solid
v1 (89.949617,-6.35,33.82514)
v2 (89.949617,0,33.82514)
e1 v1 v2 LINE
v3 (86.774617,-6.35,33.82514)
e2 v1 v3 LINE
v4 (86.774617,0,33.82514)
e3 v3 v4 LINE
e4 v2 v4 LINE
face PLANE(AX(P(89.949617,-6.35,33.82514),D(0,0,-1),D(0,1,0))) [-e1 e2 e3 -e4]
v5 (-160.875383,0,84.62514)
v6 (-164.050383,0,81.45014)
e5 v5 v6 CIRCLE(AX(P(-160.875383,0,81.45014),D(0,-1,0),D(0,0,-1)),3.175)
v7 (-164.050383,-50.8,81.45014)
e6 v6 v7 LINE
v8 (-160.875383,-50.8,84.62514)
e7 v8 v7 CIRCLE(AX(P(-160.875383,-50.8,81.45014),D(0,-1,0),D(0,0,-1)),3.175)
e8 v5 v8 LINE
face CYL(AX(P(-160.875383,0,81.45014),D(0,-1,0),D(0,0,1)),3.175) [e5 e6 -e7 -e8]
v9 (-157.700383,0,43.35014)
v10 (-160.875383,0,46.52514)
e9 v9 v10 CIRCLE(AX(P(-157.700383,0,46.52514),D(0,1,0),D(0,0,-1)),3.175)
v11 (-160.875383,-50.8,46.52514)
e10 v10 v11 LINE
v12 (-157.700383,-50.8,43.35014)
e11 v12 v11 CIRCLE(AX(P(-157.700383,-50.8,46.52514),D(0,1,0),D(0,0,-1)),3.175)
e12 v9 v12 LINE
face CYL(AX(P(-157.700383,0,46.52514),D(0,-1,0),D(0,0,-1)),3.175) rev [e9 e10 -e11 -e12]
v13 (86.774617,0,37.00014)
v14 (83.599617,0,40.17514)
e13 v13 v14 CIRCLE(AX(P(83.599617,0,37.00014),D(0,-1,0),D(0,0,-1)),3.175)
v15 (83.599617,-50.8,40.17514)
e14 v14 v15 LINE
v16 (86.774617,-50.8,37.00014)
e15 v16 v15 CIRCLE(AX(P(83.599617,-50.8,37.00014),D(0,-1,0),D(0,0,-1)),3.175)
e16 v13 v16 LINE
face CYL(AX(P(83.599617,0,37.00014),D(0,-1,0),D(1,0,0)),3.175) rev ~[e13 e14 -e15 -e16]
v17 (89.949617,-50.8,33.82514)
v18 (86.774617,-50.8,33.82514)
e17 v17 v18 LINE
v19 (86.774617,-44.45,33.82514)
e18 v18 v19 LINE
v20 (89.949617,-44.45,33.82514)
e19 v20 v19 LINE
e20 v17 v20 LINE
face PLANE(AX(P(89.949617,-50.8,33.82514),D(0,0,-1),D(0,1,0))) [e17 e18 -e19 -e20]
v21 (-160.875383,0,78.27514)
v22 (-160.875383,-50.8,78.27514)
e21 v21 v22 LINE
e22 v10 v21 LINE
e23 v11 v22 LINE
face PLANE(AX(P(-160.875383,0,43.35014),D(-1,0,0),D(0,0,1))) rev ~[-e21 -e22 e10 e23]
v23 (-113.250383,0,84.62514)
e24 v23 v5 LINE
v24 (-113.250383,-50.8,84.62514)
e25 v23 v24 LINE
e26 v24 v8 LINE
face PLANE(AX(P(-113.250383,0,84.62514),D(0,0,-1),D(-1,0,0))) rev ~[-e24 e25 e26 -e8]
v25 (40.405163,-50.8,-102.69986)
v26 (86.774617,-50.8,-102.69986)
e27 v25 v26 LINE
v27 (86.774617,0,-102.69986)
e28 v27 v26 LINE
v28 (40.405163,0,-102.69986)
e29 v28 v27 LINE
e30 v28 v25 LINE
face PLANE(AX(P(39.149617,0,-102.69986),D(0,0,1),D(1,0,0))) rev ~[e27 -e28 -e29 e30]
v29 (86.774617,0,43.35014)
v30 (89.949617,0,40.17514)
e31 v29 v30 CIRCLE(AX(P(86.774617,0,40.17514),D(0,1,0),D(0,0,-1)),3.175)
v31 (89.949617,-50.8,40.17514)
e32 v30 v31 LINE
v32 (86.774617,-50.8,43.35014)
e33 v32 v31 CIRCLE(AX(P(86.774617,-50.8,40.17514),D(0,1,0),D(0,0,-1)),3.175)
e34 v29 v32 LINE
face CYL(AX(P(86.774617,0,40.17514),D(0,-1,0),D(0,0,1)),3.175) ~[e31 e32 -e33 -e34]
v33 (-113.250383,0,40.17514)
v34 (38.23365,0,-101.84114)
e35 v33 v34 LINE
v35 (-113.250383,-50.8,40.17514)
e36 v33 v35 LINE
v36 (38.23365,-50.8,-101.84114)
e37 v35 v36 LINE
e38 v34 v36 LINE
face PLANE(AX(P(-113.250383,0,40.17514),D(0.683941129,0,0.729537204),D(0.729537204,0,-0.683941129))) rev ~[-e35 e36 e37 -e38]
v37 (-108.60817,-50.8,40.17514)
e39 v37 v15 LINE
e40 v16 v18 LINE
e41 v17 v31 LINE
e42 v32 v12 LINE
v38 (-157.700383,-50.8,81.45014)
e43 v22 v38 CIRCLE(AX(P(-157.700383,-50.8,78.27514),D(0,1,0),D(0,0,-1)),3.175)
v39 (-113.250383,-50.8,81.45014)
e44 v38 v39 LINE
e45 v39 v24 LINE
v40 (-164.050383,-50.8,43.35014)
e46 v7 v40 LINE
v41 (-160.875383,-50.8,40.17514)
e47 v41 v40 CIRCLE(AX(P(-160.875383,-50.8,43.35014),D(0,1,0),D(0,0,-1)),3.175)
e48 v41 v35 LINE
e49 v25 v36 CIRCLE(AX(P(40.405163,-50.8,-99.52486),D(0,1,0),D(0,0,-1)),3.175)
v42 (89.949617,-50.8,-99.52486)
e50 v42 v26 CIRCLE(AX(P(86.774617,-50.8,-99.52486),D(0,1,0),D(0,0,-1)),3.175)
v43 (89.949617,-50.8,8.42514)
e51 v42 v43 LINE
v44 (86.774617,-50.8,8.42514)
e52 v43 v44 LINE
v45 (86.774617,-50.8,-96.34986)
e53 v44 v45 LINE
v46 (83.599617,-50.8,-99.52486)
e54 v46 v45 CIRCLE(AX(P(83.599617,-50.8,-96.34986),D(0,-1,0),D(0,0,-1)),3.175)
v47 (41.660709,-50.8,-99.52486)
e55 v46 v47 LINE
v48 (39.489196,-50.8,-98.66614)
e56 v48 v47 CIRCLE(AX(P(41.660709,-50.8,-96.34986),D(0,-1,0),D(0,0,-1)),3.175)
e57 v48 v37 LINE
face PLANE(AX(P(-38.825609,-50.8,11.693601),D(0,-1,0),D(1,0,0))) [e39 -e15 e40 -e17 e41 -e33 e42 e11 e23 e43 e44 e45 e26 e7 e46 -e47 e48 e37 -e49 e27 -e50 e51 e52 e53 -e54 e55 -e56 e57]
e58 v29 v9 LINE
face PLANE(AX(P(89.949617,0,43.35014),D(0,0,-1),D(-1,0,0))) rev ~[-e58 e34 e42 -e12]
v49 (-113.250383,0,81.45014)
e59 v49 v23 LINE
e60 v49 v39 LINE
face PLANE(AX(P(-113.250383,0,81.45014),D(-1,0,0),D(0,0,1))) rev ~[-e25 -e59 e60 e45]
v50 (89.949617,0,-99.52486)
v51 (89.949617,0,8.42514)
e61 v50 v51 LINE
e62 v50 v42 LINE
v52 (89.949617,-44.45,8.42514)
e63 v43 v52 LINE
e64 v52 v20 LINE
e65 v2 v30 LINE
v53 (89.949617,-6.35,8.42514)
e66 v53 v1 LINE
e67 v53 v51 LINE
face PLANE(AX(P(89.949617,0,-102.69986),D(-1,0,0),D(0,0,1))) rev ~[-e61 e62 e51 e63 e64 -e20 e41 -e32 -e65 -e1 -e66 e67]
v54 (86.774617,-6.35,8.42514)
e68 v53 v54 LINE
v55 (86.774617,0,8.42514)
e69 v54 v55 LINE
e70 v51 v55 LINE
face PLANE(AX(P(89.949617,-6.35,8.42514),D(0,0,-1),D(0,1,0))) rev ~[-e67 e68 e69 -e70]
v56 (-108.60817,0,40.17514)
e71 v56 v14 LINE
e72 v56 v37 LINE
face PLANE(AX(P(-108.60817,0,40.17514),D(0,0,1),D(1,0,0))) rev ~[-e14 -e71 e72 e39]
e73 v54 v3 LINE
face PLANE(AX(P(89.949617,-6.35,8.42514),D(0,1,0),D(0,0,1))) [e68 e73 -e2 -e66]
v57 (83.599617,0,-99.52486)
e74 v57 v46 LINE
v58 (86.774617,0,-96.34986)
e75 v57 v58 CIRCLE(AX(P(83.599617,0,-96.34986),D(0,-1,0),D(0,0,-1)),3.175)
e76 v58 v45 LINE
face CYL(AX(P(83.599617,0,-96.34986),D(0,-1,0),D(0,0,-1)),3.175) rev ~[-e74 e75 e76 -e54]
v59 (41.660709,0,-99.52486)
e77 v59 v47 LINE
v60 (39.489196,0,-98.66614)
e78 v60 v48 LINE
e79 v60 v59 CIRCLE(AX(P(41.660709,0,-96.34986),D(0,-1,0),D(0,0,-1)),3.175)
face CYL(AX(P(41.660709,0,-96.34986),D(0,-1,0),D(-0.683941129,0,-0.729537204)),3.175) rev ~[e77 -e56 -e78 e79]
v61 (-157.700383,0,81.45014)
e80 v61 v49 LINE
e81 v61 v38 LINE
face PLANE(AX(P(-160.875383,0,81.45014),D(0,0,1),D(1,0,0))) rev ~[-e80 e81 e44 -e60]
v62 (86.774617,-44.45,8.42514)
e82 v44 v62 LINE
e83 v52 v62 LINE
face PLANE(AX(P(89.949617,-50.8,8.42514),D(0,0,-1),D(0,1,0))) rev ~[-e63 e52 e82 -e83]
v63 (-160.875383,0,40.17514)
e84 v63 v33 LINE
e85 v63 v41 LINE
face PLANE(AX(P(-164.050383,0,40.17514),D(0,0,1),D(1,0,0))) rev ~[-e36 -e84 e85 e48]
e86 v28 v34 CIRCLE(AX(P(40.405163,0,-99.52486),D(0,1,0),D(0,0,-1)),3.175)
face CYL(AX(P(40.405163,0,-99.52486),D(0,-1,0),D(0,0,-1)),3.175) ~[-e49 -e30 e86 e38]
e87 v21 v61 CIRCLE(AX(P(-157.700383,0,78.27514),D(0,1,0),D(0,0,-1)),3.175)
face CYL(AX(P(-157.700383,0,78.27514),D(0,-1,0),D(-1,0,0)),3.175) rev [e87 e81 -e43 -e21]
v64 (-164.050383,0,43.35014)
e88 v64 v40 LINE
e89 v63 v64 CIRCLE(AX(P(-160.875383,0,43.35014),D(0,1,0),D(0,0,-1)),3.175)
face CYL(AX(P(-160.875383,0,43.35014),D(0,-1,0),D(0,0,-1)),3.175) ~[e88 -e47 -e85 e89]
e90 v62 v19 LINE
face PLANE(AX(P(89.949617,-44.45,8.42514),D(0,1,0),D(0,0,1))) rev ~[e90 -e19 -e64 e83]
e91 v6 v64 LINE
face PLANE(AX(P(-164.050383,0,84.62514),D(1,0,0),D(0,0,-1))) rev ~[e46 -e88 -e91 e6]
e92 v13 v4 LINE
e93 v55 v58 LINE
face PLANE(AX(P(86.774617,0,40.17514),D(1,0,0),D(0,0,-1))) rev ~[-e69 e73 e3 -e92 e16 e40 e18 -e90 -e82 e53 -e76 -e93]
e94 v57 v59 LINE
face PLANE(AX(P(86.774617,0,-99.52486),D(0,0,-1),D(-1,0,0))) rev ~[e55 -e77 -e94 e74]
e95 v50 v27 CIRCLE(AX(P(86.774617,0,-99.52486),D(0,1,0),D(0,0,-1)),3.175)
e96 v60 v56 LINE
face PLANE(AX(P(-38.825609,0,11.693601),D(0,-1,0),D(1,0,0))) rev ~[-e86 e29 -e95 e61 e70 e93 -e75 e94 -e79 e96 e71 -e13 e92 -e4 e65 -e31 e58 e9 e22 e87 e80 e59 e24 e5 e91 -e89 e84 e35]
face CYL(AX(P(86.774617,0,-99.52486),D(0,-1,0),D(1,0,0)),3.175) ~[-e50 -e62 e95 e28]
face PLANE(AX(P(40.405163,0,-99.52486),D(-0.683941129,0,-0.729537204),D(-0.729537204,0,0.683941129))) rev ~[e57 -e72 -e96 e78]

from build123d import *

# Parameters (mm, degrees)
F1_DEPTH = 50.8
F2_R     = 3.175
F4_W     = 6.35
F4_H     = 25.4
F5_DEPTH = 25.4


# Not quite as in the source:
# - two fillets or chamfers of one size are made in one step
# - a feature names something its author has since deleted; it is built from what else it names


with BuildPart() as f1:
    # F0 (on Front) → F1 (new body)
    with BuildSketch(Plane.XZ):
        Polygon((89.9496172311, 43.3501401251), (-160.8753827689, 43.3501401251), (-160.8753827689, 81.4501401251), (-113.2503827689, 81.4501401251), (-113.2503827689, 84.6251401251), (-164.0503827689, 84.6251401251), (-164.0503827689, 40.1751401251), (-113.2503827689, 40.1751401251), (39.1496172311, -102.6998598749), (89.9496172311, -102.6998598749), align=None)
        Polygon((-108.6081703534, 40.1751401251), (86.7746172311, 40.1751401251), (86.7746172311, -99.5248598749), (40.4051629799, -99.5248598749), align=None, mode=Mode.SUBTRACT)
    extrude(amount=F1_DEPTH)

    # F2
    f2_edges = [f1.edges().sort_by_distance(p)[0] for p in [
        (-164.050383, -25.4, 84.62514),
        (-160.875383, -25.4, 43.35014),
        (89.949617, -25.4, 43.35014),
        (89.949617, -25.4, -102.69986),
        (-164.050383, -25.4, 40.17514),
        (-160.875383, -25.4, 81.45014),
        (39.149617, -25.4, -102.69986),
        (40.405163, -25.4, -99.52486),
        (86.774617, -25.4, 40.17514),
        (86.774617, -25.4, -99.52486),
    ]]
    fillet(f2_edges, radius=F2_R)

    # F4 (on face) → F5 (cut)
    with BuildSketch(Plane.YZ.offset(89.9496172311)):
        with Locations((-3.175, 21.1251401251)):
            Rectangle(F4_W, F4_H)
        with Locations((-47.625, 21.1251401251)):
            Rectangle(F4_W, F4_H)
    extrude(amount=-F5_DEPTH, mode=Mode.SUBTRACT)


solid = f1.part
